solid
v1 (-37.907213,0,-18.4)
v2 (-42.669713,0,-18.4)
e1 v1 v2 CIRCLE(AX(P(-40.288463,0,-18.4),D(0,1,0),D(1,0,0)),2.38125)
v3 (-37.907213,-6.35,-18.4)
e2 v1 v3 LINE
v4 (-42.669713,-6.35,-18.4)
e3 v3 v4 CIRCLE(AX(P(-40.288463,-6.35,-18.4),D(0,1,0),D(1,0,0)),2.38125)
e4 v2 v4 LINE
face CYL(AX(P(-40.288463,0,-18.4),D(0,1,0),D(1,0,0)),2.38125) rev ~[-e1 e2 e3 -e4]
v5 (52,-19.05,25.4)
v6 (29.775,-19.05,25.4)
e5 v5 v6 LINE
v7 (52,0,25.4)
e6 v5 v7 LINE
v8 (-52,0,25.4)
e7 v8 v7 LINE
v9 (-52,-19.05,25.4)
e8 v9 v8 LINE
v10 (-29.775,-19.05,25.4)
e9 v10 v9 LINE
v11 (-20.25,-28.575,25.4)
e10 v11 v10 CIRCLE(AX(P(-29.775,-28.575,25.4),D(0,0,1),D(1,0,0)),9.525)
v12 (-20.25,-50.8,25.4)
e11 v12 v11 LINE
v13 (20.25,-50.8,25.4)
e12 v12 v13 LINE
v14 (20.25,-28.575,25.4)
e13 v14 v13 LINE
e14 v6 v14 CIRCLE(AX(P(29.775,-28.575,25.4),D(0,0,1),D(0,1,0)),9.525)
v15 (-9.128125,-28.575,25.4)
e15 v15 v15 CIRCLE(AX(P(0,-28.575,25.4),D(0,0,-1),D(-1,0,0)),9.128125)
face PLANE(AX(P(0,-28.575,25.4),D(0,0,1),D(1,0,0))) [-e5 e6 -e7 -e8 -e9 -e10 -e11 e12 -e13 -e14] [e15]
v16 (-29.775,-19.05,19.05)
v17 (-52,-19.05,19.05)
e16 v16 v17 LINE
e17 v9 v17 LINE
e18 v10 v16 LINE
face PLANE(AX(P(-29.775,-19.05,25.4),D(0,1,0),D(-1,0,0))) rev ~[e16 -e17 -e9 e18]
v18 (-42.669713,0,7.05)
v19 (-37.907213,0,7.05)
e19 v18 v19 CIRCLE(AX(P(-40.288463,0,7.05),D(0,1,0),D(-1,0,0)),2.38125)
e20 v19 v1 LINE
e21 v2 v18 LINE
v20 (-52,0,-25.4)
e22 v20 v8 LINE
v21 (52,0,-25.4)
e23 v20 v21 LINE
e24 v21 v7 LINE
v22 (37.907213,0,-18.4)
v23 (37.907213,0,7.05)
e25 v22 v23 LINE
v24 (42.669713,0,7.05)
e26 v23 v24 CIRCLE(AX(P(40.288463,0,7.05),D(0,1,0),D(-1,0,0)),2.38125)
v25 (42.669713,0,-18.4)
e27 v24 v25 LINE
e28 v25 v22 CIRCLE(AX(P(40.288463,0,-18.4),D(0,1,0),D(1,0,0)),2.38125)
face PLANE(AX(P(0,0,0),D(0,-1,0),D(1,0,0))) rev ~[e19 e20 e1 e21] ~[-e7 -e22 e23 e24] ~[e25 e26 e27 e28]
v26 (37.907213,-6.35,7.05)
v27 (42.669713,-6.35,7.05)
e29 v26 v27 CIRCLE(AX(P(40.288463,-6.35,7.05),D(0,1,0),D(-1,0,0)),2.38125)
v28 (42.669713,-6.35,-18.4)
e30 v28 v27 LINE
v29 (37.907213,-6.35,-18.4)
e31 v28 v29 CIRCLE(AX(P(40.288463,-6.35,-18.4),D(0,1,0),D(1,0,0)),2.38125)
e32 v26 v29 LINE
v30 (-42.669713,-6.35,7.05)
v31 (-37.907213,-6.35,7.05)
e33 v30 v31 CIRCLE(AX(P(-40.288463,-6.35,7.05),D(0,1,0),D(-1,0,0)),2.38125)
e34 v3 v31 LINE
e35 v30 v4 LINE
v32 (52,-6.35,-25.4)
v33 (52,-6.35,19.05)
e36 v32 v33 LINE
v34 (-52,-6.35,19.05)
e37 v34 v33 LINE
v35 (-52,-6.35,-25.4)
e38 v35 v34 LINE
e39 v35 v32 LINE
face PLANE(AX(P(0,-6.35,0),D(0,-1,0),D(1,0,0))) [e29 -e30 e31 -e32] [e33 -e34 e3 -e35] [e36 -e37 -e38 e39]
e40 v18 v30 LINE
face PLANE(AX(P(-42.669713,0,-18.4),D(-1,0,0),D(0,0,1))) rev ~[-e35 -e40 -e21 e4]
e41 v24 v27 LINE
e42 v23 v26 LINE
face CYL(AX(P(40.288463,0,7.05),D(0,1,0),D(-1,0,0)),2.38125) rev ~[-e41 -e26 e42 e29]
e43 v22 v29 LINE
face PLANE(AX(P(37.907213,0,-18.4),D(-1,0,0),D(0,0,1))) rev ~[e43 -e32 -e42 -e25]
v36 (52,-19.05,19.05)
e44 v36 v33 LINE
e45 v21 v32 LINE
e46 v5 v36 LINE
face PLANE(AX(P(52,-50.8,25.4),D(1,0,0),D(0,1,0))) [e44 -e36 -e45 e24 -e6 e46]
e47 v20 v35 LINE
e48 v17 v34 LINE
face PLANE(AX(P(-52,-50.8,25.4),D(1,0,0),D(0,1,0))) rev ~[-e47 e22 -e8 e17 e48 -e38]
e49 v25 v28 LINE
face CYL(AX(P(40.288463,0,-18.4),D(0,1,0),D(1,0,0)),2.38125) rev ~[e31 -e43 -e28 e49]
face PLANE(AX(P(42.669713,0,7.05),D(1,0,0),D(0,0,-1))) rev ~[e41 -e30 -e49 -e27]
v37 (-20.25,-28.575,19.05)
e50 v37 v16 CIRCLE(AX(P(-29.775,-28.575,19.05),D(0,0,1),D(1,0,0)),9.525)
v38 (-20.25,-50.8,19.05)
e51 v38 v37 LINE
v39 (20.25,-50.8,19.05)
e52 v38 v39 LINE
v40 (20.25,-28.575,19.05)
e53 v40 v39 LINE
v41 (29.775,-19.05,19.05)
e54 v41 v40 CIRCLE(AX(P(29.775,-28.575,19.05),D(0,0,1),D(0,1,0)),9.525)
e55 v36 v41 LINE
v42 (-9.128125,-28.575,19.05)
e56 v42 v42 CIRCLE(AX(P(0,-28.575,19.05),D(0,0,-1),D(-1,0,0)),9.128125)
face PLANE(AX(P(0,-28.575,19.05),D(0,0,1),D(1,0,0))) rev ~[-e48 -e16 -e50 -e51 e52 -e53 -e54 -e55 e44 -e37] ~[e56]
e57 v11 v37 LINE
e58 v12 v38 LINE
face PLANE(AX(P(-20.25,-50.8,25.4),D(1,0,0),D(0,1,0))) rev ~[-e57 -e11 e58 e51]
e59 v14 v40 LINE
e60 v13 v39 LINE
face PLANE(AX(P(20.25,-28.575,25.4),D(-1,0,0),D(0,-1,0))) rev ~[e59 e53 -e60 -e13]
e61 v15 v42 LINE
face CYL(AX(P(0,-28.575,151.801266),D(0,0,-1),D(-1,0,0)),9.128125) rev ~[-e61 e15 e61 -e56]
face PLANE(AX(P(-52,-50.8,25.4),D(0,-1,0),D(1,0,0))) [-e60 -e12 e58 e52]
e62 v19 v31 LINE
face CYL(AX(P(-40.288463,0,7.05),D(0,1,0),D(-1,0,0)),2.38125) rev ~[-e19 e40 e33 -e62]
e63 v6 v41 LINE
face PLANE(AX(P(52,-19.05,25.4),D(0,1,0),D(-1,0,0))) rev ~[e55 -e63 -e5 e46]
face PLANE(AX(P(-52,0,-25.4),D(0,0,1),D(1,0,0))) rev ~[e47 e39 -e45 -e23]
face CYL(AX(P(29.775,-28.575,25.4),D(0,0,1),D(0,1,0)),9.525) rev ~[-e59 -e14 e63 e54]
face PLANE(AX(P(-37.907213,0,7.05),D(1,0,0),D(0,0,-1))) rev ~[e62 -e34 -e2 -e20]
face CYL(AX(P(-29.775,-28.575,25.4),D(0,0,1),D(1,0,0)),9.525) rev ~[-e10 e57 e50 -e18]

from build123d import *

# Parameters (mm, degrees)
F0_W     = 104
F0_H     = 50.8
F1_DEPTH = 6.35
F2_W     = 104
F2_H     = 44.45
F3_DEPTH = 6.35
F6_D     = 18.25625
F8_DEPTH = 50.801
F9_DEPTH = 50.801


# Not quite as in the source:
# - a length typed as a fraction of an inch, garbled in the dataset ("3 / 203.2 mm" for 3/8 in), is restored


with BuildPart() as f1:
    # F0 (on Front) → F1 (new body)
    with BuildSketch(Plane.XZ):
        Rectangle(F0_W, F0_H)
    extrude(amount=F1_DEPTH)

    # F2 (on face) → F3 (join)
    with BuildSketch(Plane.XY.offset(25.4)):
        with Locations((0, -28.575)):
            Rectangle(F2_W, F2_H)
    extrude(amount=-F3_DEPTH)

    # F6 (through all)
    with Locations(Plane.XY.offset(25.4)):
        with Locations((0, -28.575)):
            Hole(F6_D / 2)

    # F7 (on face) → F8 (cut, through all)
    with BuildSketch(Plane.XY.offset(25.4)):
        with BuildLine():
            Line((-29.775, -19.05), (-52, -19.05))
            Line((-52, -19.05), (-52, -50.8))
            Line((-52, -50.8), (-20.25, -50.8))
            Line((-20.25, -50.8), (-20.25, -28.575))
            ThreePointArc((-20.25, -28.575), (-23.0398079092, -21.8398079092), (-29.775, -19.05))
        make_face()
        with BuildLine():
            Line((20.25, -28.575), (20.25, -50.8))
            Line((20.25, -50.8), (52, -50.8))
            Line((52, -50.8), (52, -19.05))
            Line((52, -19.05), (29.775, -19.05))
            ThreePointArc((29.775, -19.05), (23.0398079092, -21.8398079092), (20.25, -28.575))
        make_face()
    extrude(amount=-F8_DEPTH, mode=Mode.SUBTRACT)

    # F4 (on face) → F9 (cut, through all)
    with BuildSketch(Plane(origin=(0, 0, 0), x_dir=(-1, 0, 0), z_dir=(0, 1, 0))):
        with BuildLine():
            ThreePointArc((37.9072132349, -18.4), (40.2884632349, -20.78125), (42.6697132349, -18.4))
            Line((42.6697132349, -18.4), (42.6697132349, 7.05))
            ThreePointArc((42.6697132349, 7.05), (40.2884632349, 9.43125), (37.9072132349, 7.05))
            Line((37.9072132349, 7.05), (37.9072132349, -18.4))
        make_face()
        with BuildLine():
            ThreePointArc((-42.6697132349, -18.4), (-40.2884632349, -20.78125), (-37.9072132349, -18.4))
            Line((-37.9072132349, -18.4), (-37.9072132349, 7.05))
            ThreePointArc((-37.9072132349, 7.05), (-40.2884632349, 9.43125), (-42.6697132349, 7.05))
            Line((-42.6697132349, 7.05), (-42.6697132349, -18.4))
        make_face()
    extrude(amount=-F9_DEPTH, mode=Mode.SUBTRACT)


solid = f1.part
